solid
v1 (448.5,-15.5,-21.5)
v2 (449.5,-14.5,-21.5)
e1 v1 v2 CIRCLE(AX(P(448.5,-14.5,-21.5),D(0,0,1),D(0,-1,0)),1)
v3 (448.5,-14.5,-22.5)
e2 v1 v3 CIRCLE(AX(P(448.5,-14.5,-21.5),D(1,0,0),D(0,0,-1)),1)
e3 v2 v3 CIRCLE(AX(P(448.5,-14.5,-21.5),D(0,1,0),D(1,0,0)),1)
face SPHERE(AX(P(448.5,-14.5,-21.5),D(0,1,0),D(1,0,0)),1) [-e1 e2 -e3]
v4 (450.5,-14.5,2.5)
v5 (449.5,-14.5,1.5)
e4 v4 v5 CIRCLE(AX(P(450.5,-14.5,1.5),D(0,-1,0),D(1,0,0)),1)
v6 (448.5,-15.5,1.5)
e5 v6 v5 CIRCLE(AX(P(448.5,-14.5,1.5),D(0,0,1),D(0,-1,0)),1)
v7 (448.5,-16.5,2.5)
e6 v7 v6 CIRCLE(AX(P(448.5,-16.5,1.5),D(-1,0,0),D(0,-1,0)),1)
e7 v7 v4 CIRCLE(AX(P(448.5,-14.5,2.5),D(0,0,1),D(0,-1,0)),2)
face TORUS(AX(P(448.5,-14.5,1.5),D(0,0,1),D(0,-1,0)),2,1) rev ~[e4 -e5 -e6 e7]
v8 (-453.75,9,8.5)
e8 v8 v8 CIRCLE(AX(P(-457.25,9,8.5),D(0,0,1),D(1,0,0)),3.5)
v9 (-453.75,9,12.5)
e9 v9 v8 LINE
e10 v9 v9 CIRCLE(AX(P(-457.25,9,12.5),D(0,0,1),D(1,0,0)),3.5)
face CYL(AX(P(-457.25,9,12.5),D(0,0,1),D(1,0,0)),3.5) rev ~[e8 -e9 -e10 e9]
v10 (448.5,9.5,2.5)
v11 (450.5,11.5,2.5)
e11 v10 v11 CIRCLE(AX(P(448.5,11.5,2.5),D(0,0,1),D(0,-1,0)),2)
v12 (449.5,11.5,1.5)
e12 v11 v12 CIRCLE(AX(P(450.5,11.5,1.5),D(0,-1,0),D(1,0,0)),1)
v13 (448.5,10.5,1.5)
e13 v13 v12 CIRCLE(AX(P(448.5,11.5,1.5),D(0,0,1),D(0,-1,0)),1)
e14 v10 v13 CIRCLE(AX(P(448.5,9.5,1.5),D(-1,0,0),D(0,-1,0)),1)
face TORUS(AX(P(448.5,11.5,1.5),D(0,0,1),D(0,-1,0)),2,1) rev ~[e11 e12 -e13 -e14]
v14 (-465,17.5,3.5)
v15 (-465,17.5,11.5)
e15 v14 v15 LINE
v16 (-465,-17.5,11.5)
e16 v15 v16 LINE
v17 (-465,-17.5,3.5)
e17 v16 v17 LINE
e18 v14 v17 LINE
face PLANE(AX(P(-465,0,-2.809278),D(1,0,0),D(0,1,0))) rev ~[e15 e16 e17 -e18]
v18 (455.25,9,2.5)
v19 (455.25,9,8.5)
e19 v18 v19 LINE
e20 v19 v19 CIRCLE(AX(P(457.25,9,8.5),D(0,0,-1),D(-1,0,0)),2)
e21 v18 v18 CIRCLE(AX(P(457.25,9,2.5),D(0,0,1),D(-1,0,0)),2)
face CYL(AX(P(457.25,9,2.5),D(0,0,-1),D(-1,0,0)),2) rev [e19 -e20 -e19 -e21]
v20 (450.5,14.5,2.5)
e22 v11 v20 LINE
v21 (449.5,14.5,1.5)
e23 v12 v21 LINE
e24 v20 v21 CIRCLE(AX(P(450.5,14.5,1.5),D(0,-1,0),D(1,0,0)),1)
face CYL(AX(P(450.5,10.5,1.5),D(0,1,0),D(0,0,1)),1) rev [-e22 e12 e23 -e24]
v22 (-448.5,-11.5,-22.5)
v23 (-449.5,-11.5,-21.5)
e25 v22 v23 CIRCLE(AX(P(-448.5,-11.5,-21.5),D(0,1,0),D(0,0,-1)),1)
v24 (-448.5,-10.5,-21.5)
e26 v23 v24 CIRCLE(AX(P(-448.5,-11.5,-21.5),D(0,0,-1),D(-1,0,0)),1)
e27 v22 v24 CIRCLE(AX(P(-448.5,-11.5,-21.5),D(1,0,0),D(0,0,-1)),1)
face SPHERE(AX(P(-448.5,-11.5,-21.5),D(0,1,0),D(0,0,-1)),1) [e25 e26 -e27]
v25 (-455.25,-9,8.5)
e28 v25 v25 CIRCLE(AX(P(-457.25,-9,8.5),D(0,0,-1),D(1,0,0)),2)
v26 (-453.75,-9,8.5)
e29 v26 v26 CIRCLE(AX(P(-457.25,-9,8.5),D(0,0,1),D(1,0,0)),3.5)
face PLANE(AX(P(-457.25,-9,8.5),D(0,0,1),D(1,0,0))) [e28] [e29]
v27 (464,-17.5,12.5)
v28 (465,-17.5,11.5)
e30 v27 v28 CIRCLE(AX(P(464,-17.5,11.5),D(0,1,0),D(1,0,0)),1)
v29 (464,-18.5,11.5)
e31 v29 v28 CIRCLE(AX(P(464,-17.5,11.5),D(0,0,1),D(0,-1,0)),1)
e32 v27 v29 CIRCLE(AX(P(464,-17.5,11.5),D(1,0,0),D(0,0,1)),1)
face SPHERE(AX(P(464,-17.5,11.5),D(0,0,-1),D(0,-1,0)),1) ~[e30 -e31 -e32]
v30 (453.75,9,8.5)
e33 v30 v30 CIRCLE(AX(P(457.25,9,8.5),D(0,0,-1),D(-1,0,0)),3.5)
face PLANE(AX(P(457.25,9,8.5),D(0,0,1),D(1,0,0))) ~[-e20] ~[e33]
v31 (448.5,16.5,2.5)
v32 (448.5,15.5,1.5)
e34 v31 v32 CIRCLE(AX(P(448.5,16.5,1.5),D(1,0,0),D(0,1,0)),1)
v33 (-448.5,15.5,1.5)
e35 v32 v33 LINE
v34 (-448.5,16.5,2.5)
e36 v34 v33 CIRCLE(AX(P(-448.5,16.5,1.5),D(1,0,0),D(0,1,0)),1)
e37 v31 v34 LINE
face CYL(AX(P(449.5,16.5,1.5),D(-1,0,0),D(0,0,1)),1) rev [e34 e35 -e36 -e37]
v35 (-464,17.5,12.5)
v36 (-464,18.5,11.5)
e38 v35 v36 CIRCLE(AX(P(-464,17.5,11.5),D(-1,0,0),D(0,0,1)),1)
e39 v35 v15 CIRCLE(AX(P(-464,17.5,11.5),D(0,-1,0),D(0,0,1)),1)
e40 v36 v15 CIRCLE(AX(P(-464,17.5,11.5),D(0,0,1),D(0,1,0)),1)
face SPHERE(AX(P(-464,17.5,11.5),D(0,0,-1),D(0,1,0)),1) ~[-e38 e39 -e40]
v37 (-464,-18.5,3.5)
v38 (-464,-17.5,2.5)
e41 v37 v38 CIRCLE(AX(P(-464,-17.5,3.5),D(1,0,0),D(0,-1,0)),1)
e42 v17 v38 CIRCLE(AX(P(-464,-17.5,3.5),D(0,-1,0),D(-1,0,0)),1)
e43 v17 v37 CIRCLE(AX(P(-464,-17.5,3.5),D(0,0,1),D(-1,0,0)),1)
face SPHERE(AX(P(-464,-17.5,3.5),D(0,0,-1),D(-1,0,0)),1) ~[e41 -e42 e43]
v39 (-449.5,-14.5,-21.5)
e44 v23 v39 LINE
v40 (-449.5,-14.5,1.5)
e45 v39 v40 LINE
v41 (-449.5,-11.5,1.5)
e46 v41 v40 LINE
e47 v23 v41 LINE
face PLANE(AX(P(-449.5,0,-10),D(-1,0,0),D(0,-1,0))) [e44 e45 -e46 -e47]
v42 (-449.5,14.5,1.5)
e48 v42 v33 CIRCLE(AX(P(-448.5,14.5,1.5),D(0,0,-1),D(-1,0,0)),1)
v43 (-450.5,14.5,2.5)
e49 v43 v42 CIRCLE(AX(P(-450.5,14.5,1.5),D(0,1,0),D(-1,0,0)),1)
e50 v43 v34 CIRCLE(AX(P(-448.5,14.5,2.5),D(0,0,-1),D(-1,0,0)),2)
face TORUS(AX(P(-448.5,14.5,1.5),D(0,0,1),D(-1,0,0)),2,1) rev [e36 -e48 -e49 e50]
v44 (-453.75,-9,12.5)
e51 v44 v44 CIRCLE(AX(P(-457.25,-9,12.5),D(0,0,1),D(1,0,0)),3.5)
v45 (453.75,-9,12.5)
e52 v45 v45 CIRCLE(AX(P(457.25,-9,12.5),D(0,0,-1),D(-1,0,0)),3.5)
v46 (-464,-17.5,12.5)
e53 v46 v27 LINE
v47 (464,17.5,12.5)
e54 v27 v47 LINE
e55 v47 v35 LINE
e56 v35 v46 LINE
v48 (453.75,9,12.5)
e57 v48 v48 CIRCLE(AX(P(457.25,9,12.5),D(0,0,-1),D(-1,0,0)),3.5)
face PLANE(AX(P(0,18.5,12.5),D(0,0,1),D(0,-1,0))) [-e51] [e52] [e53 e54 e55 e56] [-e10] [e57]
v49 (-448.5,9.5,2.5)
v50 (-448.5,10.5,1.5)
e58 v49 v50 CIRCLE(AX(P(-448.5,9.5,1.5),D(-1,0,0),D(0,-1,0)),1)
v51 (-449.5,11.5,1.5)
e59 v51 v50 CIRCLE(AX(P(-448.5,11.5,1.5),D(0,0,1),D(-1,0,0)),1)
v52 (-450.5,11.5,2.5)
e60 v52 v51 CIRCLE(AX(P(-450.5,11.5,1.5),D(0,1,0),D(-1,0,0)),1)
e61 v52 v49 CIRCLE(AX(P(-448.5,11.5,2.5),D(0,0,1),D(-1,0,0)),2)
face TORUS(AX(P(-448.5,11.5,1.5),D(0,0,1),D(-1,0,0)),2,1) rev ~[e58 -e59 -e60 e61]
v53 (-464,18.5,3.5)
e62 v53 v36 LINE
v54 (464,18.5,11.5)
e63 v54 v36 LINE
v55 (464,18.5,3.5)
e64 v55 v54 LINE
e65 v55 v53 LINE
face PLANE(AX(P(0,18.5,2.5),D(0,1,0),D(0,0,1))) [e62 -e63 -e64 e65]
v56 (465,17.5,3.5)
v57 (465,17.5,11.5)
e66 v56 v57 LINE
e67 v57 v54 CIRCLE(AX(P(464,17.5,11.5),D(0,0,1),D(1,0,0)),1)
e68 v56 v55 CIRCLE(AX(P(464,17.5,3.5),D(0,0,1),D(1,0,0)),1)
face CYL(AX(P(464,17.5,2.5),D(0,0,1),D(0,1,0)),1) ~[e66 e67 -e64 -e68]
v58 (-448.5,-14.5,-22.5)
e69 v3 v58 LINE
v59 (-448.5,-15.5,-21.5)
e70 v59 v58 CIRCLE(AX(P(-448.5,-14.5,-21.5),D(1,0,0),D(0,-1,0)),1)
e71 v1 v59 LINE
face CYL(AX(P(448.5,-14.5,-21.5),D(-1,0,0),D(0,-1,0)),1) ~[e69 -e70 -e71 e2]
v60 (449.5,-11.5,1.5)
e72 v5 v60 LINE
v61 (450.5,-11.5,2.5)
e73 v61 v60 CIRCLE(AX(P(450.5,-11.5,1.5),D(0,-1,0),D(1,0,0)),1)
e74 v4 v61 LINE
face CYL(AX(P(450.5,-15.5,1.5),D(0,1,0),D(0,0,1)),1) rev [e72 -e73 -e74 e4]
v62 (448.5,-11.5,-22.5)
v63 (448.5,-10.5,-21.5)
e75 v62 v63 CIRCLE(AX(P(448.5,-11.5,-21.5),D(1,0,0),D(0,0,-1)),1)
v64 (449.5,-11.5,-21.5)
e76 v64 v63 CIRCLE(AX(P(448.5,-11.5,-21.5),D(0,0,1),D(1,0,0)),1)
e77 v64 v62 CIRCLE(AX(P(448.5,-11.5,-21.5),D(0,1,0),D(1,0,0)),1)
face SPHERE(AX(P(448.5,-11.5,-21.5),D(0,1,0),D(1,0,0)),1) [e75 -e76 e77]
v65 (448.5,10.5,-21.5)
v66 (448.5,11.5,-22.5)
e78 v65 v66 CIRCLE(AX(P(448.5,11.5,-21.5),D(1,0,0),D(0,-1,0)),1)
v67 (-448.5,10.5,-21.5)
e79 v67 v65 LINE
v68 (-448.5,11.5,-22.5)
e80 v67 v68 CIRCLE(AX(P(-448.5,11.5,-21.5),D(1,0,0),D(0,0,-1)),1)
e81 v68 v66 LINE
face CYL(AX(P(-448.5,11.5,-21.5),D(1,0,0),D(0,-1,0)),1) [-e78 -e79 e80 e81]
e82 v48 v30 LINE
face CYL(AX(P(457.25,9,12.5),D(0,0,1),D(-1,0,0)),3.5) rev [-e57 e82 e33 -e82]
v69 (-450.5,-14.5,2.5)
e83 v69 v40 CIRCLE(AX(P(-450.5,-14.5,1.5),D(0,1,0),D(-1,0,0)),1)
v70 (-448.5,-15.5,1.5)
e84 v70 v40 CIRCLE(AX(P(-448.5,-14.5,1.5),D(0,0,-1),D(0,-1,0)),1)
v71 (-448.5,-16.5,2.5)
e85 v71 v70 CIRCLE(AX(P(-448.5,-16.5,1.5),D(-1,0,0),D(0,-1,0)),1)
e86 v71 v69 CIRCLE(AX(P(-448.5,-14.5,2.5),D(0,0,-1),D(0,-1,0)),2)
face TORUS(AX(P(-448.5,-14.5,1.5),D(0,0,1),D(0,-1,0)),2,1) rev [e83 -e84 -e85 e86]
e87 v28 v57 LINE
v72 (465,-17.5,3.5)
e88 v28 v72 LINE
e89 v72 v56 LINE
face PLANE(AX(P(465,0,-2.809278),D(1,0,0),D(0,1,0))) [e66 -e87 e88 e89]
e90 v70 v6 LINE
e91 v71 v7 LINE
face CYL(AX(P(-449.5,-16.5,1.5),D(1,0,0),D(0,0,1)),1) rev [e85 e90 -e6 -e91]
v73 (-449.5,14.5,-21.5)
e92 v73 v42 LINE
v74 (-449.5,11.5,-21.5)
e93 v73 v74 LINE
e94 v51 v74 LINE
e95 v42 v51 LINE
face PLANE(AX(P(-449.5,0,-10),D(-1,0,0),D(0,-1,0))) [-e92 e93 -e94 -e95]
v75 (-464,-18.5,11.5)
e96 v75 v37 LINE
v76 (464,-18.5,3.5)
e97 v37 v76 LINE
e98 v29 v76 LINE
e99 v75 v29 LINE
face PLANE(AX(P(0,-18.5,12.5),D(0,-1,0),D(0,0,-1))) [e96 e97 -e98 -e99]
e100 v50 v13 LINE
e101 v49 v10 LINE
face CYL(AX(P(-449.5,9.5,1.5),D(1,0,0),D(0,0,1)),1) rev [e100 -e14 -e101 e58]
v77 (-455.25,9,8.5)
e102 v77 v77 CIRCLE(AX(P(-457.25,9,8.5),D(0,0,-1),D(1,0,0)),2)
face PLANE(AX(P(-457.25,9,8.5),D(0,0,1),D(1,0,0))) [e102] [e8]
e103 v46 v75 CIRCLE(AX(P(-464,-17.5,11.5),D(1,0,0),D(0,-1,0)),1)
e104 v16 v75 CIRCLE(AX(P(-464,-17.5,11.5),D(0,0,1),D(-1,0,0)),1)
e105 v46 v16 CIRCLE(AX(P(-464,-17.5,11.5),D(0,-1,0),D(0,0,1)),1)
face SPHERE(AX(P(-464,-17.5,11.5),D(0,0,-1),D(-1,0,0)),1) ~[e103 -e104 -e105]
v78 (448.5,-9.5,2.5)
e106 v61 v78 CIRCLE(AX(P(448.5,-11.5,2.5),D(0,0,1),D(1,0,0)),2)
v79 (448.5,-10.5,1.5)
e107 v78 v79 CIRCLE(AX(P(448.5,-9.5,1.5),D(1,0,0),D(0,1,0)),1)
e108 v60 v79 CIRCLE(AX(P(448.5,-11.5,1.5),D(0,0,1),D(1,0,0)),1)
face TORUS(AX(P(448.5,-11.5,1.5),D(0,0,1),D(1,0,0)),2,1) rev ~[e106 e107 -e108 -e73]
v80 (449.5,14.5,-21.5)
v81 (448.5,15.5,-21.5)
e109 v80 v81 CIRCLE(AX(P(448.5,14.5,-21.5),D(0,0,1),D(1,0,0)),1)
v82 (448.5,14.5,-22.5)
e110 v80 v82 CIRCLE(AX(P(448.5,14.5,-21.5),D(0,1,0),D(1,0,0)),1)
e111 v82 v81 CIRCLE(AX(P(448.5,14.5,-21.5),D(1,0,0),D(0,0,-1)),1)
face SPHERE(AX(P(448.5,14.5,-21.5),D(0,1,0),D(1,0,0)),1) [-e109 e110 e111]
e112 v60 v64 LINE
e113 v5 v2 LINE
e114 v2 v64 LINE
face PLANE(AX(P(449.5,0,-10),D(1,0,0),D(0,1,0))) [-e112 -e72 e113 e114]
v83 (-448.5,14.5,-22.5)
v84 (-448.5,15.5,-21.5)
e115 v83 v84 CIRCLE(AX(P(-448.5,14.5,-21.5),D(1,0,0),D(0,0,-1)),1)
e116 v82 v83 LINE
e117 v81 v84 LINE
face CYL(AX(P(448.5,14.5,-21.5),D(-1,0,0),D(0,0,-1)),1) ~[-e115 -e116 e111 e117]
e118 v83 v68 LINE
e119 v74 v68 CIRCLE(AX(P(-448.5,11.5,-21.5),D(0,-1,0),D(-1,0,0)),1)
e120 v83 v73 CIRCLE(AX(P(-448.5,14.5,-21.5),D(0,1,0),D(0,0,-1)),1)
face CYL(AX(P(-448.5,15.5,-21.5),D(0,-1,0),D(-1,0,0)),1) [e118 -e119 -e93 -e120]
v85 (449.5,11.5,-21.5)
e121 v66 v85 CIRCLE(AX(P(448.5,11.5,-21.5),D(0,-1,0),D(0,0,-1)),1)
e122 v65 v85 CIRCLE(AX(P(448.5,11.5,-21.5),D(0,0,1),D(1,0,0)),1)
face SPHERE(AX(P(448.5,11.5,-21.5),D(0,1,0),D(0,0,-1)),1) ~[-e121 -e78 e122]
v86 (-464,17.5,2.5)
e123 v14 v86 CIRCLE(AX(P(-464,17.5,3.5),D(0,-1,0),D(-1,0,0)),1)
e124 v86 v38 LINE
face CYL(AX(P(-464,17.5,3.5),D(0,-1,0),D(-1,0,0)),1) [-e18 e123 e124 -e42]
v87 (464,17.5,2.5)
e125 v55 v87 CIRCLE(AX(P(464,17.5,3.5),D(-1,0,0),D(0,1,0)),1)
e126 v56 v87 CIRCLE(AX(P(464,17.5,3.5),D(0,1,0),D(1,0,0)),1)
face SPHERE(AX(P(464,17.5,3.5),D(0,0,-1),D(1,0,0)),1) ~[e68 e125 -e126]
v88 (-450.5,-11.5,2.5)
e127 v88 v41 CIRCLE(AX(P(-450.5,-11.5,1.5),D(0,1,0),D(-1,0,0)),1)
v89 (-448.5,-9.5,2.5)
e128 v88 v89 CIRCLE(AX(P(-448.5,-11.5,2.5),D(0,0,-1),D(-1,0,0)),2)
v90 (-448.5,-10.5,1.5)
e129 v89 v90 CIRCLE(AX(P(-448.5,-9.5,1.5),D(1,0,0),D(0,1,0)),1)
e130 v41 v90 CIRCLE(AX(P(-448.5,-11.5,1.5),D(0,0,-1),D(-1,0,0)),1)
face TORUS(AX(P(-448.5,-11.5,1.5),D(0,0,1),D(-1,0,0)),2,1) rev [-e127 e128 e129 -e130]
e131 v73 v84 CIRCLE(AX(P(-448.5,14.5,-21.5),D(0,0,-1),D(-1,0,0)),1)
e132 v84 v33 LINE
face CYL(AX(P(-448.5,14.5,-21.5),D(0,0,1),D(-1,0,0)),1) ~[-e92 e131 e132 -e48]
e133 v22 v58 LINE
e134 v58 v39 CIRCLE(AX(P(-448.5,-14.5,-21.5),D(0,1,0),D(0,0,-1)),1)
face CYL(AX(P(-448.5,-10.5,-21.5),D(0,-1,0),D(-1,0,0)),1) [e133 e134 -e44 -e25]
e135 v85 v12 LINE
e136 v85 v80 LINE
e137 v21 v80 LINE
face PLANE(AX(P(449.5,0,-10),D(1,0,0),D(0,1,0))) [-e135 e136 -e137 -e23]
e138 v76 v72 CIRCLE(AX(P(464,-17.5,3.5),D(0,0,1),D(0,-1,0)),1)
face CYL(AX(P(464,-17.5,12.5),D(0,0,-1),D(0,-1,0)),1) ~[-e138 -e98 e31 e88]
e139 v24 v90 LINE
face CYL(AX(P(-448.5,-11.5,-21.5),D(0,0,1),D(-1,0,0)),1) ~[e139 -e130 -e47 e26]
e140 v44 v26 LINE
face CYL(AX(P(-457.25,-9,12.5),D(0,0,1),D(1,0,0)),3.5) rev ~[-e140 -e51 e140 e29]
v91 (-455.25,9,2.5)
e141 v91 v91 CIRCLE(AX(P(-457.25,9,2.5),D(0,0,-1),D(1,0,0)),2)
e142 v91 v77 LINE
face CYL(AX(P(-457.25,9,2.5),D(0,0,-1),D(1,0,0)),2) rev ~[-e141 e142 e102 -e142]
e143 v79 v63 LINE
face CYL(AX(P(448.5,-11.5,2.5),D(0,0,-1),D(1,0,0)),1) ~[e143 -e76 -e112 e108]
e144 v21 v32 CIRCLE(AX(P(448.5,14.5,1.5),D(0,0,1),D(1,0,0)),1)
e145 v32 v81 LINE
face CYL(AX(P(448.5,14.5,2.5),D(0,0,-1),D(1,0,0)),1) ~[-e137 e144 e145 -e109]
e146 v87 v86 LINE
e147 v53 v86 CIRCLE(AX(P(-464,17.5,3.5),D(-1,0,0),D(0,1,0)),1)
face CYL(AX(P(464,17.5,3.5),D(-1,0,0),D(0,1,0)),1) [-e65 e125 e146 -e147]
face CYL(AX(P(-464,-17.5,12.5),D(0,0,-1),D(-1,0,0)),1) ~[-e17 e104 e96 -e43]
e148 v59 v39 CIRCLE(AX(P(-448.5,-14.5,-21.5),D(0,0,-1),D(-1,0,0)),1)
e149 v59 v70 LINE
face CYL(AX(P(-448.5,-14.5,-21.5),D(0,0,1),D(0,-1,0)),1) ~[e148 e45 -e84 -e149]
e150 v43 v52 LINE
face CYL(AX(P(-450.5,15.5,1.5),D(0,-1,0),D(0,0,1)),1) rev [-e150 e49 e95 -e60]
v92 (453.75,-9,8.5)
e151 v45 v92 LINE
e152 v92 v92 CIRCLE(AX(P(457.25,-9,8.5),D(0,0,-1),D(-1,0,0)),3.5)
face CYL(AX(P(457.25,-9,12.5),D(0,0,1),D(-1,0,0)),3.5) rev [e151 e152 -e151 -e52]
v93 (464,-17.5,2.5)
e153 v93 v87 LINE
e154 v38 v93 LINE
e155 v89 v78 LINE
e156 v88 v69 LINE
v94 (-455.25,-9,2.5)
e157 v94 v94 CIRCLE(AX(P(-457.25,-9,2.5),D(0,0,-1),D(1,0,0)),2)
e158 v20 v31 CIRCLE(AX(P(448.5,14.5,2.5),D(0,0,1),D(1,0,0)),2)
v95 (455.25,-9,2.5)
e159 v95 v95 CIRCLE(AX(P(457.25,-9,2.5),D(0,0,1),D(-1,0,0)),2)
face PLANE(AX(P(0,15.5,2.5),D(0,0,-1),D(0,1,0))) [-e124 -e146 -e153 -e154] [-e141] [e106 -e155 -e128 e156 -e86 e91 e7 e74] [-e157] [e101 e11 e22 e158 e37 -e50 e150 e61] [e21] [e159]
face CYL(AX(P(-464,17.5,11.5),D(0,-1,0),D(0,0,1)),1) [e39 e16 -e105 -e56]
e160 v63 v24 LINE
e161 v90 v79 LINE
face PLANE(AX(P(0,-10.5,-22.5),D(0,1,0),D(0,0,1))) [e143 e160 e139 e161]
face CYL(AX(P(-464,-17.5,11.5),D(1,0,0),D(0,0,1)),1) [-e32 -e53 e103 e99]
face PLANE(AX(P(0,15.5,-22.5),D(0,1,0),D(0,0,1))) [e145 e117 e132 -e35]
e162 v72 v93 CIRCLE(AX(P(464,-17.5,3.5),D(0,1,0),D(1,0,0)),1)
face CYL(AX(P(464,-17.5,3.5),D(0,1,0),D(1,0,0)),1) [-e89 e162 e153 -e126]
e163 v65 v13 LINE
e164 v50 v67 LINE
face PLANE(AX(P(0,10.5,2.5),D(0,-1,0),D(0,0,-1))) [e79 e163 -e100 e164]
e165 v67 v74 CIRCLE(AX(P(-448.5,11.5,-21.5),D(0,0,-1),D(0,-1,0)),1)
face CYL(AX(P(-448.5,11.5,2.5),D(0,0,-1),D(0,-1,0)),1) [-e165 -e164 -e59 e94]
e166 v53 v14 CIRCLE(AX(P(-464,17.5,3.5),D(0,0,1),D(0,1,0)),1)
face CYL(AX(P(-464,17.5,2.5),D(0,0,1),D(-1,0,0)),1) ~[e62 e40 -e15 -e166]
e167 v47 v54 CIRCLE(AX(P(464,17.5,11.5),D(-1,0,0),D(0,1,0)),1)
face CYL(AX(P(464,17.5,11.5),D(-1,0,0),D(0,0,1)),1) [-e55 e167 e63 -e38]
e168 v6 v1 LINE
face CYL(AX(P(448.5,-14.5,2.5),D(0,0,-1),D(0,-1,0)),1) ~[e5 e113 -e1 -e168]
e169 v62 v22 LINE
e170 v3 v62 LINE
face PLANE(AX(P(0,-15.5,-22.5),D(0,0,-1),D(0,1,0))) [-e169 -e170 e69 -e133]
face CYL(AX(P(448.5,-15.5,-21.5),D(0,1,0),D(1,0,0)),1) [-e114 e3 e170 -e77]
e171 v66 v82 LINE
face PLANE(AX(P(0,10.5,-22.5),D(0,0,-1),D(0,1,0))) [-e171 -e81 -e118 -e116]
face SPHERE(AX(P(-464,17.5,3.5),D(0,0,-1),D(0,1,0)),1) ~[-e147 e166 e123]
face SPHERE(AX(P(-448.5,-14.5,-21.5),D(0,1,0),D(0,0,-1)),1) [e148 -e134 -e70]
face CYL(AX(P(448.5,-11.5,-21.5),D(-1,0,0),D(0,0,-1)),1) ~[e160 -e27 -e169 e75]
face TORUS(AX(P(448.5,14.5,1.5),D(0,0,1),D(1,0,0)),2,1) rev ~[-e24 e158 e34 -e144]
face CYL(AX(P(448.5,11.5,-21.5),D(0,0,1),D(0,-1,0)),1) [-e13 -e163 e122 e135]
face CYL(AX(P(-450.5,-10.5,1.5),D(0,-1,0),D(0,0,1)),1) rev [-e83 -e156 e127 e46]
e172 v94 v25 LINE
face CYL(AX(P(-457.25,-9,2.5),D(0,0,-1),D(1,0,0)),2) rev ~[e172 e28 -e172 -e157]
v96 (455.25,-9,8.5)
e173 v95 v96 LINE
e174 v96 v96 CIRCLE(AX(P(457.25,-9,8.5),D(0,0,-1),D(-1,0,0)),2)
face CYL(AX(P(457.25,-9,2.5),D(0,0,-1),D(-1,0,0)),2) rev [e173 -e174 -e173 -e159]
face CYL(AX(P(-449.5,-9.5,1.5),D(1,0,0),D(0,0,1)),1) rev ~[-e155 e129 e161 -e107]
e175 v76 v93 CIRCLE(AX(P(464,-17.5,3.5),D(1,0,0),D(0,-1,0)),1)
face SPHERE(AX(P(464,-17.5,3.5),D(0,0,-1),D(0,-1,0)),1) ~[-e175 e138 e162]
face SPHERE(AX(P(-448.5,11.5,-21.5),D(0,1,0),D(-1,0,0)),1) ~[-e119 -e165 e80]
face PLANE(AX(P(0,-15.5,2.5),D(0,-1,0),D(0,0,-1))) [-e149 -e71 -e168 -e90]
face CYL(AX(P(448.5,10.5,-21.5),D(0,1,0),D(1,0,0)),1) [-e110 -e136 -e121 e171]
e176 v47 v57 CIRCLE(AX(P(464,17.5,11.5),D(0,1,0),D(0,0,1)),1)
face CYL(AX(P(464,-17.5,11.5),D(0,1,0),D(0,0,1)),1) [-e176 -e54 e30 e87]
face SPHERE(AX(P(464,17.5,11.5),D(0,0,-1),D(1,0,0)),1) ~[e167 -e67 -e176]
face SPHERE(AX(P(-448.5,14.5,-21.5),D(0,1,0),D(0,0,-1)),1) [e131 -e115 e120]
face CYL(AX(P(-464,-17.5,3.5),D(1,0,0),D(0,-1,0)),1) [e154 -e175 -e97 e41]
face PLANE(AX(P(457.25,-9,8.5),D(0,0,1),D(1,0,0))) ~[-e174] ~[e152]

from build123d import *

# Parameters (mm, degrees)
F1_DEPTH = 465
F2_W     = 31
F2_H     = 25
F3_DEPTH = 15.5
F4_W     = 31
F4_H     = 25
F5_DEPTH = 15.5
F6_R     = 2
F7_DEPTH = 10.001
F8_R     = 3.5
F9_DEPTH = 4
F10_R    = 1
F11_R    = 1


# Not quite as in the source:
# - a pattern or mirror of a feature is missing from the dataset's text; its kind, count and spacing are read off the source's solid


with BuildPart() as f1:
    # F0 (on Right) → F1 (new body, symmetric)
    with BuildSketch(Plane.YZ):
        Polygon((18.5, 12.5), (-18.5, 12.5), (-18.5, 2.5), (-15.5, 2.5), (-15.5, -22.5), (-10.5, -22.5), (-10.5, 2.5), (0, 2.5), (10.5, 2.5), (10.5, -22.5), (15.5, -22.5), (15.5, 2.5), (18.5, 2.5), align=None)
    extrude(amount=F1_DEPTH, both=True)

    # F2 (on face) → F3 (cut)
    with BuildSketch(Plane(origin=(-465, 0, 0), x_dir=(0, -1, 0), z_dir=(-1, 0, 0))):
        with Locations((0, -10)):
            Rectangle(F2_W, F2_H)
    extrude(amount=-F3_DEPTH, mode=Mode.SUBTRACT)

    # F4 (on face) → F5 (cut)
    with BuildSketch(Plane.YZ.offset(465)):
        with Locations((0, -10)):
            Rectangle(F4_W, F4_H)
    extrude(amount=-F5_DEPTH, mode=Mode.SUBTRACT)

    # F6 (on face) → F7 (cut, through all)
    with BuildSketch(Plane(origin=(0, 0, 2.5), x_dir=(1, 0, 0), z_dir=(0, 0, -1))):
        with Locations((-457.25, 9)):
            Circle(F6_R)
        with Locations((-457.25, -9)):
            Circle(F6_R)
    f7 = extrude(amount=-F7_DEPTH, mode=Mode.SUBTRACT)

    # F7_copies: F7 across plane
    add(f7.mirror(Plane(origin=(0, 0, 0), x_dir=(0, 0, 1), z_dir=(1, 0, 0))), mode=Mode.SUBTRACT)

    # F8 (on face) → F9 (cut)
    with BuildSketch(Plane.XY.offset(12.5)):
        with Locations((-457.25, -9)):
            Circle(F8_R)
        with Locations((-457.25, 9)):
            Circle(F8_R)
    f9 = extrude(amount=-F9_DEPTH, mode=Mode.SUBTRACT)

    # F9_copies: F9 across plane
    add(f9.mirror(Plane(origin=(0, 0, 0), x_dir=(0, 0, 1), z_dir=(1, 0, 0))), mode=Mode.SUBTRACT)

    # F10
    f10_edges = [f1.edges().sort_by_distance(p)[0] for p in [
        (465, 18.5, 7.5),
        (465, -18.5, 7.5),
        (449.5, 13, -22.5),
        (449.5, -13, -22.5),
        (-465, -18.5, 7.5),
        (-449.5, -13, -22.5),
        (-449.5, 13, -22.5),
        (-465, 18.5, 7.5),
    ]]
    fillet(f10_edges, radius=F10_R)

    # F11
    f11_edges = [f1.edges().sort_by_distance(p)[0] for p in [
        (-449.5, -10.5, -9.5),
        (-449.5, -15.5, -9.5),
        (-449.5, 15.5, -9.5),
        (-449.5, 10.5, -9.5),
        (-449.5, 13, -21.5),
        (-449.5, 13, 2.5),
        (-465, 0, 2.5),
        (-465, 0, 12.5),
        (0, -15.5, 2.5),
        (-464.707107, 18.207107, 12.5),
        (-464.707107, -18.207107, 12.5),
        (0, 18.5, 12.5),
        (0, -18.5, 12.5),
        (464.707107, 18.207107, 12.5),
        (464.707107, -18.207107, 12.5),
        (465, 0, 12.5),
        (-464.707107, 18.207107, 2.5),
        (-464.707107, -18.207107, 2.5),
        (0, 18.5, 2.5),
        (0, -18.5, 2.5),
        (464.707107, 18.207107, 2.5),
        (464.707107, -18.207107, 2.5),
        (465, 0, 2.5),
        (-449.5, -13, 2.5),
        (449.5, -13, 2.5),
        (0, -10.5, 2.5),
        (0, 10.5, 2.5),
        (449.5, 13, 2.5),
        (0, 15.5, 2.5),
        (449.5, -15.5, -9.5),
        (449.207107, -15.5, -22.207107),
        (0, -15.5, -22.5),
        (-449.207107, -15.5, -22.207107),
        (449.5, -10.5, -9.5),
        (0, -10.5, -22.5),
        (-449.207107, -10.5, -22.207107),
        (449.207107, -10.5, -22.207107),
        (449.5, 10.5, -9.5),
        (449.207107, 10.5, -22.207107),
        (0, 10.5, -22.5),
        (-449.207107, 10.5, -22.207107),
        (449.5, 15.5, -9.5),
        (0, 15.5, -22.5),
        (-449.207107, 15.5, -22.207107),
        (449.207107, 15.5, -22.207107),
    ]]
    fillet(f11_edges, radius=F11_R)


solid = f1.part
